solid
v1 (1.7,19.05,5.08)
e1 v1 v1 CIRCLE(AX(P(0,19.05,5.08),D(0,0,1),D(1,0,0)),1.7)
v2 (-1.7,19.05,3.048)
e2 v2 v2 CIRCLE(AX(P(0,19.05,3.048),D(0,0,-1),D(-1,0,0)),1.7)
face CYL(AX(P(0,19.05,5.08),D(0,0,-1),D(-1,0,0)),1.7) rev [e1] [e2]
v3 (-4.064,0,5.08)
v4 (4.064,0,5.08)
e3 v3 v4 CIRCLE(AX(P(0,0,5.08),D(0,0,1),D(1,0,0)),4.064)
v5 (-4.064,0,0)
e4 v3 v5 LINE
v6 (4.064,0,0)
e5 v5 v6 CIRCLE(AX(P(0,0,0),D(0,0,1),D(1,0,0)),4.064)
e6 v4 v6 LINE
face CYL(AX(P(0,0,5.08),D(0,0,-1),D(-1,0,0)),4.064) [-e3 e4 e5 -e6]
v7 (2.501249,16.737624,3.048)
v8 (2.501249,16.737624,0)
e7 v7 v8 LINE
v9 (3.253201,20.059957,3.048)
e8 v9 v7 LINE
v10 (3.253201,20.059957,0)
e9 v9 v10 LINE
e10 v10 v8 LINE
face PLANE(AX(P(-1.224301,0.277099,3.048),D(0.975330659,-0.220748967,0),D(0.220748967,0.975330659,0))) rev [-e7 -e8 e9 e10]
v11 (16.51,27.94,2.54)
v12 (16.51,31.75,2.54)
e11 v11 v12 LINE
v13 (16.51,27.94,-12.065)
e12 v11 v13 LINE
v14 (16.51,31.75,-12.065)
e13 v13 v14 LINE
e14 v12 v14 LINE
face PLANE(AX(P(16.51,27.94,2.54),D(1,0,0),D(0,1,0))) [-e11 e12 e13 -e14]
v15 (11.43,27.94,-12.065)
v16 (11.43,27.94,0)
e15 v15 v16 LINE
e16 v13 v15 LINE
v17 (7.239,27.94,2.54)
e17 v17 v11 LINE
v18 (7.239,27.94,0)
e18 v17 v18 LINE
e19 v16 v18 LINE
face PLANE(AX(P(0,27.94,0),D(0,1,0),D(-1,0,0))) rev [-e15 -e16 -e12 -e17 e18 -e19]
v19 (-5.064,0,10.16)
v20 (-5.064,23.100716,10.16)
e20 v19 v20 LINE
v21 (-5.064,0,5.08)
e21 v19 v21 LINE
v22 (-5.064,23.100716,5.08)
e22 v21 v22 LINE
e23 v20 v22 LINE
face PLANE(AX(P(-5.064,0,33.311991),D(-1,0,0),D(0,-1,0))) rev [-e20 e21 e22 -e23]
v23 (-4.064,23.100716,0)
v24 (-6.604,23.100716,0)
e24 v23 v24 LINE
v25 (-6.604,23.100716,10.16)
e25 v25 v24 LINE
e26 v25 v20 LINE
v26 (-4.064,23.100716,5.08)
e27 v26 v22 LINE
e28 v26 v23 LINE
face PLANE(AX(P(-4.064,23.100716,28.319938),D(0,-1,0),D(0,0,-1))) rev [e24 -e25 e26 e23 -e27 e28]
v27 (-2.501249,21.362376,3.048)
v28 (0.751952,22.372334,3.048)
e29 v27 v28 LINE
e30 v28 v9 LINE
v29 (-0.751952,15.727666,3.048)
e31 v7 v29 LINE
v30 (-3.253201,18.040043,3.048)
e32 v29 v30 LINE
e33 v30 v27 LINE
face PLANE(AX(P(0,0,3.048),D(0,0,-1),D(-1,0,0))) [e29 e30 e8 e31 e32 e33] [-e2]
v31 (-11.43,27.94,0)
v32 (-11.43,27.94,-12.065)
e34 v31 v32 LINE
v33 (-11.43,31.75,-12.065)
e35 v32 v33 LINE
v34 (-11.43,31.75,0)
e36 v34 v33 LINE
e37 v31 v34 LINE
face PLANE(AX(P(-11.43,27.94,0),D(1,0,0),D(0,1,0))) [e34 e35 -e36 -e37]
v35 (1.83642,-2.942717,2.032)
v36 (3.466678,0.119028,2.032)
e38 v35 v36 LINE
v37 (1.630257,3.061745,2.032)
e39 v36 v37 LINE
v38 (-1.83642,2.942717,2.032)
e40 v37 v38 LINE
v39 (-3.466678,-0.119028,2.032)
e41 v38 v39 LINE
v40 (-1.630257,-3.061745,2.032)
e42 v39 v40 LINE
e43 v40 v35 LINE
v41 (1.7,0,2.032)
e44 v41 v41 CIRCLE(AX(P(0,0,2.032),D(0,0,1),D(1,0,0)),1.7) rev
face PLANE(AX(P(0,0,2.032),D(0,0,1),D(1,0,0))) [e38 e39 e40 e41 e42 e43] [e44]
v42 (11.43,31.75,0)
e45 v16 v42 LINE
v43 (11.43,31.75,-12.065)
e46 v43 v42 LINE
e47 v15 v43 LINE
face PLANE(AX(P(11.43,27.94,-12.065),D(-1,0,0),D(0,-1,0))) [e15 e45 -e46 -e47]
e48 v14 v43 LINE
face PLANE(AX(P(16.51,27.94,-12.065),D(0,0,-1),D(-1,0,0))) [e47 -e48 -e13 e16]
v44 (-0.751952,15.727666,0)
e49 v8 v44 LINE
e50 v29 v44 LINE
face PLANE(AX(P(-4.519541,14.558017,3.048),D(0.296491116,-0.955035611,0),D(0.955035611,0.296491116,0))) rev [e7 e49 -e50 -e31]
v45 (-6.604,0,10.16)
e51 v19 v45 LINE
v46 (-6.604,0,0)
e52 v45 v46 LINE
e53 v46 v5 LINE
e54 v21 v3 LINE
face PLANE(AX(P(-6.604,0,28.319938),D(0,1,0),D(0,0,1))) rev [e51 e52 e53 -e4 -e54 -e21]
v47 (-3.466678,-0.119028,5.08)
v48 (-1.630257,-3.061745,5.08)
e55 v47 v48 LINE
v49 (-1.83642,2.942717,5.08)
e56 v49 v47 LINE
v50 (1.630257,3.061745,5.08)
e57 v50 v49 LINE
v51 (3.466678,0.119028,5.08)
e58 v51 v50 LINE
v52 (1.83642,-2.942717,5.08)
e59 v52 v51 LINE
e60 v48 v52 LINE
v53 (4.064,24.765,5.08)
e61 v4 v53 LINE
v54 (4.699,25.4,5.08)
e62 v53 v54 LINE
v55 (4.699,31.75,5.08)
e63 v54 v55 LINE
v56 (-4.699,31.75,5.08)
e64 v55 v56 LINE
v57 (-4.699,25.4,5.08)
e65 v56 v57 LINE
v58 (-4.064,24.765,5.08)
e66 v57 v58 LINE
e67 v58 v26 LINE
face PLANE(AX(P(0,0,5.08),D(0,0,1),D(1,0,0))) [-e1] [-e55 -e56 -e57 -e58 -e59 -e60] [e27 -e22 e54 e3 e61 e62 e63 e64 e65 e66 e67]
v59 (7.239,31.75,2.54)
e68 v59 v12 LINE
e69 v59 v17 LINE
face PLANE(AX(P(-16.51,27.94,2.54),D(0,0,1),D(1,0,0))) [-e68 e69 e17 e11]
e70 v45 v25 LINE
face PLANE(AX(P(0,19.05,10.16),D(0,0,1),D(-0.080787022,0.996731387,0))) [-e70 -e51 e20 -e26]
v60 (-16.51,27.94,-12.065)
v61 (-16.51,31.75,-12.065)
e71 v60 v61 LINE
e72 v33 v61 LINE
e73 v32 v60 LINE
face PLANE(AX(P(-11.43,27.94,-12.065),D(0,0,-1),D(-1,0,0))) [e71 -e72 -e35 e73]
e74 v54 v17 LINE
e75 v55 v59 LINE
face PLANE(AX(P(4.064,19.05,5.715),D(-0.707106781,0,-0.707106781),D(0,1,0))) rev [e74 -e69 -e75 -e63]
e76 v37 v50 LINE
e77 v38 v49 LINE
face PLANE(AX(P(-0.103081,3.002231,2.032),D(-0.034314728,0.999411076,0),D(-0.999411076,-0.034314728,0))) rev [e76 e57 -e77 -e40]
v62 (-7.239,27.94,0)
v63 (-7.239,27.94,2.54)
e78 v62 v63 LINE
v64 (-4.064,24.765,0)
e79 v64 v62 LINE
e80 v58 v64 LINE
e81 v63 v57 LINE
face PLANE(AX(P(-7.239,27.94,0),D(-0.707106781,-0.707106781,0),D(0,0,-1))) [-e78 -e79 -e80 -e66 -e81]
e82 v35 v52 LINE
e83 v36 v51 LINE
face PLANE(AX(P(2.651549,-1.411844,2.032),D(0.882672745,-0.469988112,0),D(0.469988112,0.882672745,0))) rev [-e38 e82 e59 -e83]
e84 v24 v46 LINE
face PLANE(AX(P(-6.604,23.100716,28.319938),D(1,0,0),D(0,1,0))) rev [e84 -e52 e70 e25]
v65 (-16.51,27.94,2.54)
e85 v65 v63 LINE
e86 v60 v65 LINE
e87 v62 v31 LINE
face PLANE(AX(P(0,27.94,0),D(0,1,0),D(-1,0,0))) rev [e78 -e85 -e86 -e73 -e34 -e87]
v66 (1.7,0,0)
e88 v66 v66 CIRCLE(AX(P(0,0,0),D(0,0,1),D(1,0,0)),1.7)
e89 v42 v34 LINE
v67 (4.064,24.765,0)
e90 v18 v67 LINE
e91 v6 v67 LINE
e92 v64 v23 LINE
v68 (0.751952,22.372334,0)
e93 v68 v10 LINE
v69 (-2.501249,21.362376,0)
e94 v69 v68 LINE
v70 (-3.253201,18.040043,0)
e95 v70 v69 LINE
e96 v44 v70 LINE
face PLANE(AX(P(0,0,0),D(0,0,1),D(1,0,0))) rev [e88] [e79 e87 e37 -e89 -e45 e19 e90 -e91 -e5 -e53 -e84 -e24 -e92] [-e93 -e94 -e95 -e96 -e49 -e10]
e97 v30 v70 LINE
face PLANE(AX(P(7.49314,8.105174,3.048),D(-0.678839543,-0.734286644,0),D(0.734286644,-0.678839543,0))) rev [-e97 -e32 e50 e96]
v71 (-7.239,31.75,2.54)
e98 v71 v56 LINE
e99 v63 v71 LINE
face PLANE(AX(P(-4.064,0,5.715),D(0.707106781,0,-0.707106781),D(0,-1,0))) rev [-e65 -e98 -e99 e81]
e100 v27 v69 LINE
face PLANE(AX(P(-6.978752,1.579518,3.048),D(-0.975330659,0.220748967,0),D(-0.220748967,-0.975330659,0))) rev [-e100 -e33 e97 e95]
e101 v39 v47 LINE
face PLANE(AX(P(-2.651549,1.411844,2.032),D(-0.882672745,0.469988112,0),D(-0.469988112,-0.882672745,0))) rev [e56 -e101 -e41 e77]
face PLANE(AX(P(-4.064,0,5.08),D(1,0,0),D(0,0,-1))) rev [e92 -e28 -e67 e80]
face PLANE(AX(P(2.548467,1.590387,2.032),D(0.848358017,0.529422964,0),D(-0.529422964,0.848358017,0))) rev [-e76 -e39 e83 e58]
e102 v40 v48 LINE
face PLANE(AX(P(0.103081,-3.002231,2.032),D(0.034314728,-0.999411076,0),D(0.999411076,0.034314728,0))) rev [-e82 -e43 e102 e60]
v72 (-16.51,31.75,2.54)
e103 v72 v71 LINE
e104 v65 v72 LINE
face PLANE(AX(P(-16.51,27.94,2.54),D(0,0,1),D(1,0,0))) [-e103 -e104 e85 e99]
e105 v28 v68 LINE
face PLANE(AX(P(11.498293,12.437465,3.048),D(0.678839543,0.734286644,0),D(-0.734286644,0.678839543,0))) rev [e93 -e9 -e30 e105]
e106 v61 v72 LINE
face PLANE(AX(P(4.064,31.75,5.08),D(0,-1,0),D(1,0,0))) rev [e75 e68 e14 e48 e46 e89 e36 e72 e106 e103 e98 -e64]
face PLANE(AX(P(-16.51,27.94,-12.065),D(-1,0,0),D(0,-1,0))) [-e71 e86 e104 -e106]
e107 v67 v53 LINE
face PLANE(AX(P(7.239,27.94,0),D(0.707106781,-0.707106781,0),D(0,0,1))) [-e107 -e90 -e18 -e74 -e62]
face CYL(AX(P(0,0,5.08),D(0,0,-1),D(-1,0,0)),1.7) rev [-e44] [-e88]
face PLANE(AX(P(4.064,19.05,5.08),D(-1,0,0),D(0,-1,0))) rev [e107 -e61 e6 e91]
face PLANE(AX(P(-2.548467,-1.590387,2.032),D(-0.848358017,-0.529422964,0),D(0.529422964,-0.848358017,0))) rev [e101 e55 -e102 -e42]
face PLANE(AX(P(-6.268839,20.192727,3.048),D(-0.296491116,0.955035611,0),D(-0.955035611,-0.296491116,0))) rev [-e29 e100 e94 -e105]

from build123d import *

# Parameters (mm, degrees)
SKETCH2_R           = 1.700000029
BOSS_EXTRUDE1_DEPTH = 5.08
SKETCH4_W           = 2.54
SKETCH4_H           = 23.100716355
BOSS_EXTRUDE3_DEPTH = 5.08
BOSS_EXTRUDE4_START = -5.08
SKETCH4_4_W         = 1.54
SKETCH4_4_H         = 23.100716355
BOSS_EXTRUDE4_DEPTH = 5.08
CUT_EXTRUDE1_START  = -3.048
SKETCH5_R           = 1.700000029
CUT_EXTRUDE1_DEPTH  = 3.048
CUT_EXTRUDE2_DEPTH  = 3.048
BOSS_EXTRUDE5_DEPTH = 3.81
CHAMFER4_SIZE       = 3.175
CHAMFER5_SIZE       = 3.175


with BuildPart() as part:
    # Sketch2 → Boss-Extrude1 (new body)
    with BuildSketch(Plane.XY):
        with BuildLine():
            Line((-4.064, 19.05), (-4.064, 0))
            ThreePointArc((-4.064, 0), (0, -4.064), (4.064, 0))
            Line((4.064, 0), (4.064, 19.05))
            Line((4.064, 19.05), (4.064, 31.75))
            Line((4.064, 31.75), (-4.064, 31.75))
            Line((-4.064, 31.75), (-4.064, 19.05))
        make_face()
        Circle(SKETCH2_R, mode=Mode.SUBTRACT)
        with Locations((0, 19.05)):
            Circle(SKETCH2_R, mode=Mode.SUBTRACT)
    extrude(amount=BOSS_EXTRUDE1_DEPTH)

    # Sketch4 → Boss-Extrude3 (add)
    with BuildSketch(Plane(origin=(0, 0, 0), x_dir=(-1, 0, 0), z_dir=(0, 0, -1))):
        with Locations((5.334, 11.550358178)):
            Rectangle(SKETCH4_W, SKETCH4_H)
    extrude(amount=-BOSS_EXTRUDE3_DEPTH)

    # Sketch4<4> → Boss-Extrude4 (add)
    with BuildSketch(Plane(origin=(0, 0, 0), x_dir=(-1, 0, 0), z_dir=(0, 0, -1)).offset(BOSS_EXTRUDE4_START)):
        with Locations((5.834, 11.550358178)):
            Rectangle(SKETCH4_4_W, SKETCH4_4_H)
    extrude(amount=-BOSS_EXTRUDE4_DEPTH)

    # Sketch5 → Cut-Extrude1 (cut)
    with BuildSketch(Plane.XY.offset(5.08).offset(CUT_EXTRUDE1_START)):
        Polygon((1.63025736, 3.061744972), (-1.836420245, 2.942716775), (-3.466677606, -0.119028197), (-1.63025736, -3.061744972), (1.836420245, -2.942716775), (3.466677606, 0.119028197), align=None)
        Circle(SKETCH5_R, mode=Mode.SUBTRACT)
    extrude(amount=CUT_EXTRUDE1_DEPTH, mode=Mode.SUBTRACT)

    # Sketch6 → Cut-Extrude2 (cut)
    with BuildSketch(Plane(origin=(0, 0, 0), x_dir=(-1, 0, 0), z_dir=(0, 0, -1))):
        Polygon((-3.253201396, 20.05995743), (-2.501249489, 16.737623663), (0.751951906, 15.727666232), (3.253201396, 18.04004257), (2.501249489, 21.362376337), (-0.751951906, 22.372333768), align=None)
    extrude(amount=-CUT_EXTRUDE2_DEPTH, mode=Mode.SUBTRACT)

    # Sketch9 → Boss-Extrude5 (add)
    with BuildSketch(Plane(origin=(0, 31.75, 0), x_dir=(1, 0, 0), z_dir=(0, 1, 0))):
        Polygon((-16.51, 12.065), (-16.51, -2.54), (16.51, -2.54), (16.51, 12.065), (11.43, 12.065), (11.43, 0), (-11.43, 0), (-11.43, 12.065), align=None)
    extrude(amount=-BOSS_EXTRUDE5_DEPTH)

    # Chamfer4
    # the kernel refuses this chamfer: 3.175 mm, written as the material it adds along each edge
    with BuildSketch(Plane(origin=(4.064, 27.94, 2.54), x_dir=(0.9996219169112966, 0, -0.02749587661058635), z_dir=(0, 1, 0))) as chamfer4_piece_1_section:
        Polygon((CHAMFER4_SIZE * 0.999621916911, -CHAMFER4_SIZE * 0.0274958766106), (-CHAMFER4_SIZE * 0.0274958766106, -CHAMFER4_SIZE * 0.999621916911), (0, 0), align=None)
    chamfer4_piece_1 = extrude(amount=3.81, mode=Mode.PRIVATE)
    chamfer4_piece_1 = split(chamfer4_piece_1, bisect_by=Plane(origin=(5.161655959, 29.845, 5.08), z_dir=(0, 0, -1)), keep=Keep.TOP, mode=Mode.PRIVATE)
    add(chamfer4_piece_1)
    with BuildSketch(Plane(origin=(-4.064, 31.75, 2.54), x_dir=(0.02749587661058607, 0, 0.9996219169112968), z_dir=(0, -1, 0))) as chamfer4_piece_2_section:
        Polygon((CHAMFER4_SIZE * 0.999621916911, CHAMFER4_SIZE * 0.0274958766106), (-CHAMFER4_SIZE * 0.0274958766106, CHAMFER4_SIZE * 0.999621916911), (0, 0), align=None)
    chamfer4_piece_2 = extrude(amount=3.81, mode=Mode.PRIVATE)
    chamfer4_piece_2 = split(chamfer4_piece_2, bisect_by=Plane(origin=(-5.161655959, 29.845, 5.08), z_dir=(0, 0, -1)), keep=Keep.TOP, mode=Mode.PRIVATE)
    add(chamfer4_piece_2)

    # Chamfer5
    chamfer5_edges = [part.edges().sort_by_distance(p)[0] for p in [
        (4.064, 27.94, 2.54),
        (-4.064, 27.94, 2.54),
    ]]
    chamfer(chamfer5_edges, length=CHAMFER5_SIZE)


solid = part.part
